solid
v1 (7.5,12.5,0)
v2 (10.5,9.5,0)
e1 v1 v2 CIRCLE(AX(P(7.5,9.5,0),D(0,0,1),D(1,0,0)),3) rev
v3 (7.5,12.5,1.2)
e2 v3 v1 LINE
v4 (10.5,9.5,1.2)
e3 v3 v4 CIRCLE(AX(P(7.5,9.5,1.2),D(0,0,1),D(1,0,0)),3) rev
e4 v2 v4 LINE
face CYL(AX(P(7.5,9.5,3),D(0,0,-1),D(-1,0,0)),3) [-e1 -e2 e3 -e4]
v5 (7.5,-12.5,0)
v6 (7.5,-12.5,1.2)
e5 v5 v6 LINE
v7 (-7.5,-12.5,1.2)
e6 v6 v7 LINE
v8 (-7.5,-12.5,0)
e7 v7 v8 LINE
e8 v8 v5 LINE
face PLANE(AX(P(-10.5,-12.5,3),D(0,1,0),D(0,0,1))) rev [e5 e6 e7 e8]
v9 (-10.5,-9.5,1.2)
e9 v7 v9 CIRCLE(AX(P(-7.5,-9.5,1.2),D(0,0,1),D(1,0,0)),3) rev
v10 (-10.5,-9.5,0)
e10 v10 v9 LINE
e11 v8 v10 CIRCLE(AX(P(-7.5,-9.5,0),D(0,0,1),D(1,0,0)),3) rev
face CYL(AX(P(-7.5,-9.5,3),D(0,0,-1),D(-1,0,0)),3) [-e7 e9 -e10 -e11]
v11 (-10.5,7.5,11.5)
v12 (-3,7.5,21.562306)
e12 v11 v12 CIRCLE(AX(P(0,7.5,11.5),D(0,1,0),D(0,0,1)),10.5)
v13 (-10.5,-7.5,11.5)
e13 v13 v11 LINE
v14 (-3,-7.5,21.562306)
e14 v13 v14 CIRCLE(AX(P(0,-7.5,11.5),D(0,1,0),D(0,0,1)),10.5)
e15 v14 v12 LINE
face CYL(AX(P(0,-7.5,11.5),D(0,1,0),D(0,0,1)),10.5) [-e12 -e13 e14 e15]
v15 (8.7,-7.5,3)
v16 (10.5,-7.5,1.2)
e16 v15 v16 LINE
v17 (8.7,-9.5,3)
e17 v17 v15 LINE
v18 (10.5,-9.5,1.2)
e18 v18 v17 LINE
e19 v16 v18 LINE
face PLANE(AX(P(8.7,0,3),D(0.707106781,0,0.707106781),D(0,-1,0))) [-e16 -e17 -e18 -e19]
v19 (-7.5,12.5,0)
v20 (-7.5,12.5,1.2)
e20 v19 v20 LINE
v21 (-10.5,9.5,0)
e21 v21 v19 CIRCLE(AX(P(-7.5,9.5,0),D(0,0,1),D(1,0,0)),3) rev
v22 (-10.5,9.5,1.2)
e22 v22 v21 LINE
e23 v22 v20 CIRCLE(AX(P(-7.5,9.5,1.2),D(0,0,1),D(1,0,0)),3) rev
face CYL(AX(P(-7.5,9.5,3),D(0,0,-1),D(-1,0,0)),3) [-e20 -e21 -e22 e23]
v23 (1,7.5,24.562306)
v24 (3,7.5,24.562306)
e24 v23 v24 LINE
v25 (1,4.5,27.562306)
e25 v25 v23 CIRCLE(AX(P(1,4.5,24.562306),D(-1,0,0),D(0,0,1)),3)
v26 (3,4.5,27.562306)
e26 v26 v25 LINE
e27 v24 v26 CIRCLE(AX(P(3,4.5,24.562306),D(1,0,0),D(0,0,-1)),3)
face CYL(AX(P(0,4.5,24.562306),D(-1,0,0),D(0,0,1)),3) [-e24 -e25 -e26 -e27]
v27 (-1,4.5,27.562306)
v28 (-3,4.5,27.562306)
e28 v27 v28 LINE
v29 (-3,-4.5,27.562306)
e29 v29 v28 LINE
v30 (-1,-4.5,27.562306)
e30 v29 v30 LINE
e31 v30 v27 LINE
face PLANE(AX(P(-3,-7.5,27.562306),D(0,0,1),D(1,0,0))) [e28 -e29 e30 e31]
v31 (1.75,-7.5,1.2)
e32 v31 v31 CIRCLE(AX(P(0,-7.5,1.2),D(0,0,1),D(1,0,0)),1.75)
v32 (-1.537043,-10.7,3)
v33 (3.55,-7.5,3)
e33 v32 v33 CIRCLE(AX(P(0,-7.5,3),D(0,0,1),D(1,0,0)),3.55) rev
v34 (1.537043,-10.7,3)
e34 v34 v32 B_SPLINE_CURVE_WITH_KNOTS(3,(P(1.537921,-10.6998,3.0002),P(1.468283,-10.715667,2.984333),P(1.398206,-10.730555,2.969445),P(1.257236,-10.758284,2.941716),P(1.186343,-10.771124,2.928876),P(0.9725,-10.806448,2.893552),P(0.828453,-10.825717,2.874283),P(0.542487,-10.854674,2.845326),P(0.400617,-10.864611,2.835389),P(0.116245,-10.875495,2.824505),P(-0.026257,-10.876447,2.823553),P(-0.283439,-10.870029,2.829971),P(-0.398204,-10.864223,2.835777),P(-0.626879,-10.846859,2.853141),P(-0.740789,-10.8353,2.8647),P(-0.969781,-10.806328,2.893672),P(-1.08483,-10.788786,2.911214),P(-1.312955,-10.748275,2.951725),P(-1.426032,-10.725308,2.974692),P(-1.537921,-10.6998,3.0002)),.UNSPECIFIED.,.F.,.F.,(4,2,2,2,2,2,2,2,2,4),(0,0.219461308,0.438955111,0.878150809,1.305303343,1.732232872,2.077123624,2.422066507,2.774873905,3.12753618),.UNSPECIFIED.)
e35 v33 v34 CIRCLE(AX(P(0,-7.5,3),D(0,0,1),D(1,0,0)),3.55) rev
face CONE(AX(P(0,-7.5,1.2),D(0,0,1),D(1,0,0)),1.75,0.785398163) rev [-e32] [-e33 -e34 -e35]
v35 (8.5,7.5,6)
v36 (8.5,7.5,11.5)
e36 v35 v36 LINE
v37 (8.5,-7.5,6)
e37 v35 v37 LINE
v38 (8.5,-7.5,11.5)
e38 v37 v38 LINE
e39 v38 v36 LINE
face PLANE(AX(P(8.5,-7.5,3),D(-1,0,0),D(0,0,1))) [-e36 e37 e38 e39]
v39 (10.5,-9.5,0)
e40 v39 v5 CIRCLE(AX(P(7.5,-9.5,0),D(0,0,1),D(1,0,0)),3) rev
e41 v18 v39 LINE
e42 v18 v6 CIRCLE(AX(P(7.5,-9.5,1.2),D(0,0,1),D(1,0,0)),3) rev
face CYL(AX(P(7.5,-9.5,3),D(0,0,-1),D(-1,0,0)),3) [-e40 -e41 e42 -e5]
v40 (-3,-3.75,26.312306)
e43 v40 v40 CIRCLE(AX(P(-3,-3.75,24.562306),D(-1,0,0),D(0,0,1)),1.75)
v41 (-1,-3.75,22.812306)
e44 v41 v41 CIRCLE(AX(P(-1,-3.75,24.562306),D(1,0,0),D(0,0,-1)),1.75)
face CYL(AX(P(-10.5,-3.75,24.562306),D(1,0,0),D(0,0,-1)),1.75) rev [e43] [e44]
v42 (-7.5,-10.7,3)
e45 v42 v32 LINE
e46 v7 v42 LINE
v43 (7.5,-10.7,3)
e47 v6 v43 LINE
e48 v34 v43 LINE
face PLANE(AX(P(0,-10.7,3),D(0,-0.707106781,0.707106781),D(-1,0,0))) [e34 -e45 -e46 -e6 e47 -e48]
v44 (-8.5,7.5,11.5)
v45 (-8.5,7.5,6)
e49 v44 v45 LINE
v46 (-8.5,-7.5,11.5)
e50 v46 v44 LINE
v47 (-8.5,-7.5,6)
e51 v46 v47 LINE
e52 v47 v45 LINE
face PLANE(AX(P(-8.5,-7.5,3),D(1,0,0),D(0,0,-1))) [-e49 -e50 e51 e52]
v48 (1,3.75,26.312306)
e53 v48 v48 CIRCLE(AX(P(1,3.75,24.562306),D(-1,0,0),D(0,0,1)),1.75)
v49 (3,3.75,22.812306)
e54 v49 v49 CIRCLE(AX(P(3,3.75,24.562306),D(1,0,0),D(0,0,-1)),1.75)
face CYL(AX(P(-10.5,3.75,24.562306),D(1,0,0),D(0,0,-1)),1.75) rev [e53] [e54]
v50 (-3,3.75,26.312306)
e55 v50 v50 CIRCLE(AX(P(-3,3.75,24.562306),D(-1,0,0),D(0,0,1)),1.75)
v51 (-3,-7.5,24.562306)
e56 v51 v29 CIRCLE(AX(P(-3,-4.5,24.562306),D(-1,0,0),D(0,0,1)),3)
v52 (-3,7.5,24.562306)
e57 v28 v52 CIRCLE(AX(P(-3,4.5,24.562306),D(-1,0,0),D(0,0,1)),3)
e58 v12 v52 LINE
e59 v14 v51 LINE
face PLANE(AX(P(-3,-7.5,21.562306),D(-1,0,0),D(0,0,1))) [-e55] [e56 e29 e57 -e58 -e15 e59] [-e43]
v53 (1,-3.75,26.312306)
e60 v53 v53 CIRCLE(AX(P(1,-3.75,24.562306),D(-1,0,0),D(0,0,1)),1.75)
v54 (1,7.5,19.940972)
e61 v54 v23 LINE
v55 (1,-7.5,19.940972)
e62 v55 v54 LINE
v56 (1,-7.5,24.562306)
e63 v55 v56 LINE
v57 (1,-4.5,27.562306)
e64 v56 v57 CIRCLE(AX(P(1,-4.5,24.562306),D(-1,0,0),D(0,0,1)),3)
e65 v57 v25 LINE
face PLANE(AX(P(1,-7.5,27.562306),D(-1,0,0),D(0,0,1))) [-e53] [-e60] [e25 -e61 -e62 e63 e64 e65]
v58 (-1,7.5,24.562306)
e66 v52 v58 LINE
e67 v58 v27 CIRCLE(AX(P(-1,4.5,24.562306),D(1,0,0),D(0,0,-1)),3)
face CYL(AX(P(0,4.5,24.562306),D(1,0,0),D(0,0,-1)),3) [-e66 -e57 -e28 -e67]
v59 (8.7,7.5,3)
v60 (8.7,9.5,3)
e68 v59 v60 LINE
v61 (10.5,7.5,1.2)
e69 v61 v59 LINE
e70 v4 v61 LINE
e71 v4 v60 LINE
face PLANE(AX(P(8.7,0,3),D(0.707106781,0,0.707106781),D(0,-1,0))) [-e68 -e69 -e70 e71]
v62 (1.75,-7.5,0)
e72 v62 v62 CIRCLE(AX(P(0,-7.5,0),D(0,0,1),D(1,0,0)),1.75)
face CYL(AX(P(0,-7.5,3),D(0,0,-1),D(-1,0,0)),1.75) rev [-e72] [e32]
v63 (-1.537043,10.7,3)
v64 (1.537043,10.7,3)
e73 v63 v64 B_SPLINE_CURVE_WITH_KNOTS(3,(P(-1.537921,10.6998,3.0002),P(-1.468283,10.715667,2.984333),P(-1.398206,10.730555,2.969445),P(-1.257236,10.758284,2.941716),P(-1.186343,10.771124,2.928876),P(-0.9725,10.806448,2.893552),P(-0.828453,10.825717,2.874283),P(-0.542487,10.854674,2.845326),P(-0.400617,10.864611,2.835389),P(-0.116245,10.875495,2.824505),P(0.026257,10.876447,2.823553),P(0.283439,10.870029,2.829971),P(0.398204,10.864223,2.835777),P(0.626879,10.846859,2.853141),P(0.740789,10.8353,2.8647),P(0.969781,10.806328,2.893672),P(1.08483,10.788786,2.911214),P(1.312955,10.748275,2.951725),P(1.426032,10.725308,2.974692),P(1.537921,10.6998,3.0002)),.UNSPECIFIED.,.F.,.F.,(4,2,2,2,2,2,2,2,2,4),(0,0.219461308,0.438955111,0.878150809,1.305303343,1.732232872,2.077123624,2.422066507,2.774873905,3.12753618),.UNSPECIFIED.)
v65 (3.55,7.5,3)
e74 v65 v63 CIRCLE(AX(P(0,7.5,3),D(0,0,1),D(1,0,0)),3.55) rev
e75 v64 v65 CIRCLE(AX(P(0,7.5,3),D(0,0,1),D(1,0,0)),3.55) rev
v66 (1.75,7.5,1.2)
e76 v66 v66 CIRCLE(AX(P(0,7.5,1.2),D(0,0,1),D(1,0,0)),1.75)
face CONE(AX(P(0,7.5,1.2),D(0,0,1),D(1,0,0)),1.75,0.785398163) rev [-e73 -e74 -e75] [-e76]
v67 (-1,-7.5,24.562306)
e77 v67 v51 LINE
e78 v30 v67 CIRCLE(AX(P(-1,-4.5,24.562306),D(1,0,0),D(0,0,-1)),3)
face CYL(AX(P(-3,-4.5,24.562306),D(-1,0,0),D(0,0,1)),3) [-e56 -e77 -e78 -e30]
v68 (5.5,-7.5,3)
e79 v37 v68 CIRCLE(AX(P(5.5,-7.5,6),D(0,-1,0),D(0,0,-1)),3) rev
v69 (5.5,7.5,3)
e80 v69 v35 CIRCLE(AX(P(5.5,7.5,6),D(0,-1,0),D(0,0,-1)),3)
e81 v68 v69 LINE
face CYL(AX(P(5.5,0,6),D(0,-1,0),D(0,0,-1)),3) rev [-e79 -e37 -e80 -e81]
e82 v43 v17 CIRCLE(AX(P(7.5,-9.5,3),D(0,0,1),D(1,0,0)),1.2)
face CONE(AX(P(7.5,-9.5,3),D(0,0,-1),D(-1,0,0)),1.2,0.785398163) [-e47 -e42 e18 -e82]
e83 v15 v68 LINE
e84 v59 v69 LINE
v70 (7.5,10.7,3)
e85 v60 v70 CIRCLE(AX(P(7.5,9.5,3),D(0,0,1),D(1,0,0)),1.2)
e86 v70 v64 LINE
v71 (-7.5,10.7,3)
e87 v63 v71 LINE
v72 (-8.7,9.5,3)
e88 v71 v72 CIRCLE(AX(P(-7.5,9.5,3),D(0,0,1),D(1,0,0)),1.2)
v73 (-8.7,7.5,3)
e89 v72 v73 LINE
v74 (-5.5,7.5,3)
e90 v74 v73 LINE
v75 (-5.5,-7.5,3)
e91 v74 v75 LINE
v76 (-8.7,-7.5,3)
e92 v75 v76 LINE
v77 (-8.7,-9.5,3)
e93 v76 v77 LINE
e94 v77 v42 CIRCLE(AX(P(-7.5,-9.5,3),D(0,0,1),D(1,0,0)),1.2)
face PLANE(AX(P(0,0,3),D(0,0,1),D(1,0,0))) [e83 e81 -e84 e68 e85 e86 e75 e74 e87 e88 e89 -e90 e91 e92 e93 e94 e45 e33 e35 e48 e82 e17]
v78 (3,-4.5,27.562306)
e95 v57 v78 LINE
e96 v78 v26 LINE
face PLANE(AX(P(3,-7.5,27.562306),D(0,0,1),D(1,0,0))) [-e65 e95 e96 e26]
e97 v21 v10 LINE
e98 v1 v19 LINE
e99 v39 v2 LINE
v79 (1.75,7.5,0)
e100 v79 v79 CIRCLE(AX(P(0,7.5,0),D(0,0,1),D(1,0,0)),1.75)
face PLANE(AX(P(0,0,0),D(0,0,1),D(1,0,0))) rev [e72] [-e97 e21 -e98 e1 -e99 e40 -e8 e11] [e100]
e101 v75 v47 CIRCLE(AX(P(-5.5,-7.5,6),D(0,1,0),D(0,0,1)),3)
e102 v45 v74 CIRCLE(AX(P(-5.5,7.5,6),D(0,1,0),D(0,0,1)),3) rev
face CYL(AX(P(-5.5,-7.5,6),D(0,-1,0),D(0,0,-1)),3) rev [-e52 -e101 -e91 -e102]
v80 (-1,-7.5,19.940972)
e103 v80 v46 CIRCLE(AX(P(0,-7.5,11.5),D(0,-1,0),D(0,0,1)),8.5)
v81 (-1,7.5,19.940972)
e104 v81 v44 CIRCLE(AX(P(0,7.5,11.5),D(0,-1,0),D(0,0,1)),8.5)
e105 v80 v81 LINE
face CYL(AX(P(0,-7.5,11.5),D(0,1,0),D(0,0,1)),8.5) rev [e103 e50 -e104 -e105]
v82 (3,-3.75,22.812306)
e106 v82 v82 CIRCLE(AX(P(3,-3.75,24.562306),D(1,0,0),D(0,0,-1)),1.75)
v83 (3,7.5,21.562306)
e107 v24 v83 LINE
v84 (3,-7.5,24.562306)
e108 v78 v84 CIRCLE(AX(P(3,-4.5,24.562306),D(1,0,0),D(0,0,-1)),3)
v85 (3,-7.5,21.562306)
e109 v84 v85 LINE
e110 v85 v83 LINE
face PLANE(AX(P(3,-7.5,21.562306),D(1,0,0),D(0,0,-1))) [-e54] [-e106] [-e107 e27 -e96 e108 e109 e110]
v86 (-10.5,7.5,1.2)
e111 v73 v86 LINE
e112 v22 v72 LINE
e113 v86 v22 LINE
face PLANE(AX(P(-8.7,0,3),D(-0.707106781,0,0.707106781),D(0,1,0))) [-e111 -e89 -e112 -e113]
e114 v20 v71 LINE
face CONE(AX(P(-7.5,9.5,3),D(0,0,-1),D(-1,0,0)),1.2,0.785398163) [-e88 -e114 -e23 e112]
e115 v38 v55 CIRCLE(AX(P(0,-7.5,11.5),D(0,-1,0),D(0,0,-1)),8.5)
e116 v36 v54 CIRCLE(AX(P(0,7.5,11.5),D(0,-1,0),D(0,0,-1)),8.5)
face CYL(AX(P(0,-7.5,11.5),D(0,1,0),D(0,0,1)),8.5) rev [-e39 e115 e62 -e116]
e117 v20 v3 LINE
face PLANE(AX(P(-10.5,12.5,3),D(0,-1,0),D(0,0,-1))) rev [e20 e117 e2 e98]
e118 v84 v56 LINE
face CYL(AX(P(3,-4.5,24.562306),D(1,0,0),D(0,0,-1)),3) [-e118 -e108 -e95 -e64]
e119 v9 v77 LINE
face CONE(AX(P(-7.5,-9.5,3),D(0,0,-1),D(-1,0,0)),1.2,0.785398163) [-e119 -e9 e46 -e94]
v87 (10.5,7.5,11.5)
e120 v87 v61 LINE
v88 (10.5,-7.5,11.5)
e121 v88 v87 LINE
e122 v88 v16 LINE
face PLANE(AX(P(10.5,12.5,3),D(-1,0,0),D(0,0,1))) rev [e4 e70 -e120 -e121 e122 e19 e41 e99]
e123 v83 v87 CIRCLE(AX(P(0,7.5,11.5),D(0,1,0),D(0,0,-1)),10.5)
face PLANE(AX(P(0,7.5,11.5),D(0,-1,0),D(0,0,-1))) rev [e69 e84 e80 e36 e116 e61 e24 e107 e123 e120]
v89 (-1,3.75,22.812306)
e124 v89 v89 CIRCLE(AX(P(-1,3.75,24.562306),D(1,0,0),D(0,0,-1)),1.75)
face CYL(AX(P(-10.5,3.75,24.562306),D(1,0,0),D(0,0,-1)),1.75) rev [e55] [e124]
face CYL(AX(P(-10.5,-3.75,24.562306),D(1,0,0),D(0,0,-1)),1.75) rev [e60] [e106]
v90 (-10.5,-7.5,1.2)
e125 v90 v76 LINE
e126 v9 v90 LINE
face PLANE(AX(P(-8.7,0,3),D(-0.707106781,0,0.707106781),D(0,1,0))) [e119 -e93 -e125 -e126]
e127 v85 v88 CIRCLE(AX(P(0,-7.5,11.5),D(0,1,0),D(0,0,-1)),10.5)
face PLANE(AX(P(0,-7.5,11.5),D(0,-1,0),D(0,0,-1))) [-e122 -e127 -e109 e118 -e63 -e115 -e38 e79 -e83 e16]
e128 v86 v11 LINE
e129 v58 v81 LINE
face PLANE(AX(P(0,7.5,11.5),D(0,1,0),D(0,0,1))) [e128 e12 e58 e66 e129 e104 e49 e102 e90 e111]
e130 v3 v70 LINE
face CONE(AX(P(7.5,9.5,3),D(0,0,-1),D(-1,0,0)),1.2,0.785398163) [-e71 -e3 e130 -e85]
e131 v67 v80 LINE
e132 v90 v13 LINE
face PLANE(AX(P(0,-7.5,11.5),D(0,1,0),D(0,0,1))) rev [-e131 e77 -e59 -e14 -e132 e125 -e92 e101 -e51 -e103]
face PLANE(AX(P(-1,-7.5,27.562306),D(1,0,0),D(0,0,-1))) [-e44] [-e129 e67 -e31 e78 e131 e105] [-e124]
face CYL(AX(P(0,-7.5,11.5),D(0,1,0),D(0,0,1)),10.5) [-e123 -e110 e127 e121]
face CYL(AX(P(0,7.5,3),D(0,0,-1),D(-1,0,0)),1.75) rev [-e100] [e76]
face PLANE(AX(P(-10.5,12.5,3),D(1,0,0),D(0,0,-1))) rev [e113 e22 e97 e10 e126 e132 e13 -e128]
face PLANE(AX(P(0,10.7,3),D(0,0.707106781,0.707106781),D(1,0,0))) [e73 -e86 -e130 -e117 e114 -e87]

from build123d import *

# Parameters (mm, degrees)
SKETCH1_W               = 21
SKETCH1_H               = 25
SKETCH1_R               = 1.75
BOSS_EXTRUDE1_DEPTH     = 3
BOSS_EXTRUDE2_DEPTH     = 7.5
CUT_EXTRUDE1_DEPTH      = 34.138809672
CUT_EXTRUDE1_DEPTH_BACK = 34.138809672
SKETCH4_R               = 1.75
FILLET1_R               = 3
FILLET3_R               = 3
CHAMFER1_SIZE           = 1.8


with BuildPart() as part:
    # Sketch1 → Boss-Extrude1 (new body)
    with BuildSketch(Plane.XY):
        Rectangle(SKETCH1_W, SKETCH1_H)
        with Locations((0, 7.5)):
            Circle(SKETCH1_R, mode=Mode.SUBTRACT)
        with Locations((0, -7.5)):
            Circle(SKETCH1_R, mode=Mode.SUBTRACT)
    extrude(amount=BOSS_EXTRUDE1_DEPTH)

    # Sketch3 → Boss-Extrude2 (add, symmetric)
    with BuildSketch(Plane(origin=(0, 0, 0), x_dir=(1, 0, 0), z_dir=(0, 1, 0))):
        with BuildLine():
            Line((-8.5, -3), (-8.5, -11.5))
            ThreePointArc((-8.5, -11.5), (-6.354132514, -17.145794895), (-1, -19.940971508))
            Line((-1, -19.940971508), (-1, -27.562305899))
            Line((-1, -27.562305899), (-3, -27.562305899))
            Line((-3, -27.562305899), (-3, -21.562305899))
            ThreePointArc((-3, -21.562305899), (-8.41872912, -17.774950199), (-10.5, -11.5))
            Line((-10.5, -11.5), (-10.5, -3))
            Line((-10.5, -3), (-8.5, -3))
        make_face()
        with BuildLine():
            Line((10.5, -11.5), (10.5, -3))
            Line((10.5, -3), (8.5, -3))
            Line((8.5, -3), (8.5, -11.5))
            ThreePointArc((8.5, -11.5), (6.354132514, -17.145794895), (1, -19.940971508))
            Line((1, -19.940971508), (1, -27.562305899))
            Line((1, -27.562305899), (3, -27.562305899))
            Line((3, -27.562305899), (3, -21.562305899))
            ThreePointArc((3, -21.562305899), (8.41872912, -17.774950199), (10.5, -11.5))
        make_face()
    extrude(amount=BOSS_EXTRUDE2_DEPTH, both=True)

    # Sketch4 → Cut-Extrude1 (cut, two sides: drawn at the far end of the back side and taken through both)
    with BuildSketch(Plane(origin=(3, 0, 0), x_dir=(0, 0, -1), z_dir=(1, 0, 0)).offset(-CUT_EXTRUDE1_DEPTH_BACK)):
        with Locations((-24.562305899, 3.75)):
            Circle(SKETCH4_R)
        with Locations((-24.562305899, -3.75)):
            Circle(SKETCH4_R)
    extrude(amount=CUT_EXTRUDE1_DEPTH + CUT_EXTRUDE1_DEPTH_BACK, mode=Mode.SUBTRACT)

    # Fillet1
    fillet1_edges = [part.edges().sort_by_distance(p)[0] for p in [
        (-2, -7.5, 27.562305899),
        (-2, 7.5, 27.562305899),
        (2, -7.5, 27.562305899),
        (2, 7.5, 27.562305899),
        (10.5, -12.5, 1.5),
        (-10.5, -12.5, 1.5),
        (-10.5, 12.5, 1.5),
        (10.5, 12.5, 1.5),
    ]]
    fillet(fillet1_edges, radius=FILLET1_R)

    # Fillet3
    fillet3_edges = [part.edges().sort_by_distance(p)[0] for p in [
        (-8.5, 0, 3),
        (8.5, 0, 3),
    ]]
    fillet(fillet3_edges, radius=FILLET3_R)

    # Chamfer1
    # the kernel refuses this chamfer: 1.8 mm, written as the material it takes off along each edge
    with BuildSketch(Plane(origin=(-7.5, 12.5, 3), x_dir=(0, -0.9996219169112966, 0.027495876610586382), z_dir=(1, 0, 0)), Plane(origin=(7.5, -12.5, 3), x_dir=(0, 0.9996219169112966, 0.027495876610586382), z_dir=(-1, 0, 0))) as chamfer1_piece_1:
        Polygon((CHAMFER1_SIZE * 0.999621916911, CHAMFER1_SIZE * 0.0274958766106), (-CHAMFER1_SIZE * 0.0274958766106, CHAMFER1_SIZE * 0.999621916911), (0, 0), align=None)
    extrude(amount=15, mode=Mode.SUBTRACT)
    with BuildSketch(Plane(origin=(10.5, -7.5, 3), x_dir=(-0.9996219169112966, 0, 0.027495876610586382), z_dir=(0, -1, 0)), Plane(origin=(-10.5, -9.5, 3), x_dir=(0.9996219169112966, 0, 0.027495876610586382), z_dir=(0, 1, 0)), Plane(origin=(10.5, 9.5, 3), x_dir=(-0.9996219169112966, 0, 0.027495876610586382), z_dir=(0, -1, 0)), Plane(origin=(-10.5, 7.5, 3), x_dir=(0.9996219169112966, 0, 0.027495876610586382), z_dir=(0, 1, 0))) as chamfer1_piece_2:
        Polygon((CHAMFER1_SIZE * 0.999621916911, CHAMFER1_SIZE * 0.0274958766106), (-CHAMFER1_SIZE * 0.0274958766106, CHAMFER1_SIZE * 0.999621916911), (0, 0), align=None)
    extrude(amount=2, mode=Mode.SUBTRACT)
    with BuildSketch(Plane(origin=(7.5, 9.5, 3), x_dir=(0, 1, 0), z_dir=(-1, 0, 0))) as chamfer1_piece_3:
        Polygon((3 - CHAMFER1_SIZE, 0), (3, CHAMFER1_SIZE), (3, 0), align=None)
    revolve(axis=Axis((7.5, 9.5, 3), (0, 0, -1)), revolution_arc=90, mode=Mode.SUBTRACT)
    with BuildSketch(Plane(origin=(7.5, -9.5, 3), x_dir=(1, 0, 0), z_dir=(0, 1, 0))) as chamfer1_piece_4:
        Polygon((3 - CHAMFER1_SIZE, 0), (3, CHAMFER1_SIZE), (3, 0), align=None)
    revolve(axis=Axis((7.5, -9.5, 3), (0, 0, -1)), revolution_arc=90, mode=Mode.SUBTRACT)
    with BuildSketch(Plane(origin=(-7.5, -9.5, 3), x_dir=(-1, 0, 0), z_dir=(0, 1, 0))) as chamfer1_piece_5:
        Polygon((3 - CHAMFER1_SIZE, 0), (3, -CHAMFER1_SIZE), (3, 0), align=None)
    revolve(axis=Axis((-7.5, -9.5, 3), (0, 0, 1)), revolution_arc=90, mode=Mode.SUBTRACT)
    with BuildSketch(Plane(origin=(-7.5, 9.5, 3), x_dir=(0, 1, 0), z_dir=(1, 0, 0))) as chamfer1_piece_6:
        Polygon((3 - CHAMFER1_SIZE, 0), (3, -CHAMFER1_SIZE), (3, 0), align=None)
    revolve(axis=Axis((-7.5, 9.5, 3), (0, 0, 1)), revolution_arc=90, mode=Mode.SUBTRACT)
    with BuildSketch(Plane(origin=(0, 7.5, 3), x_dir=(1, 0, 0), z_dir=(0, -1, 0))) as chamfer1_piece_7:
        Polygon((1.75 + CHAMFER1_SIZE, 0), (1.75, -CHAMFER1_SIZE), (1.75, 0), align=None)
    revolve(axis=Axis((0, 7.5, 3), (0, 0, 1)), mode=Mode.SUBTRACT)
    with BuildSketch(Plane(origin=(0, -7.5, 3), x_dir=(1, 0, 0), z_dir=(0, -1, 0))) as chamfer1_piece_8:
        Polygon((1.75 + CHAMFER1_SIZE, 0), (1.75, -CHAMFER1_SIZE), (1.75, 0), align=None)
    revolve(axis=Axis((0, -7.5, 3), (0, 0, 1)), mode=Mode.SUBTRACT)


solid = part.part
